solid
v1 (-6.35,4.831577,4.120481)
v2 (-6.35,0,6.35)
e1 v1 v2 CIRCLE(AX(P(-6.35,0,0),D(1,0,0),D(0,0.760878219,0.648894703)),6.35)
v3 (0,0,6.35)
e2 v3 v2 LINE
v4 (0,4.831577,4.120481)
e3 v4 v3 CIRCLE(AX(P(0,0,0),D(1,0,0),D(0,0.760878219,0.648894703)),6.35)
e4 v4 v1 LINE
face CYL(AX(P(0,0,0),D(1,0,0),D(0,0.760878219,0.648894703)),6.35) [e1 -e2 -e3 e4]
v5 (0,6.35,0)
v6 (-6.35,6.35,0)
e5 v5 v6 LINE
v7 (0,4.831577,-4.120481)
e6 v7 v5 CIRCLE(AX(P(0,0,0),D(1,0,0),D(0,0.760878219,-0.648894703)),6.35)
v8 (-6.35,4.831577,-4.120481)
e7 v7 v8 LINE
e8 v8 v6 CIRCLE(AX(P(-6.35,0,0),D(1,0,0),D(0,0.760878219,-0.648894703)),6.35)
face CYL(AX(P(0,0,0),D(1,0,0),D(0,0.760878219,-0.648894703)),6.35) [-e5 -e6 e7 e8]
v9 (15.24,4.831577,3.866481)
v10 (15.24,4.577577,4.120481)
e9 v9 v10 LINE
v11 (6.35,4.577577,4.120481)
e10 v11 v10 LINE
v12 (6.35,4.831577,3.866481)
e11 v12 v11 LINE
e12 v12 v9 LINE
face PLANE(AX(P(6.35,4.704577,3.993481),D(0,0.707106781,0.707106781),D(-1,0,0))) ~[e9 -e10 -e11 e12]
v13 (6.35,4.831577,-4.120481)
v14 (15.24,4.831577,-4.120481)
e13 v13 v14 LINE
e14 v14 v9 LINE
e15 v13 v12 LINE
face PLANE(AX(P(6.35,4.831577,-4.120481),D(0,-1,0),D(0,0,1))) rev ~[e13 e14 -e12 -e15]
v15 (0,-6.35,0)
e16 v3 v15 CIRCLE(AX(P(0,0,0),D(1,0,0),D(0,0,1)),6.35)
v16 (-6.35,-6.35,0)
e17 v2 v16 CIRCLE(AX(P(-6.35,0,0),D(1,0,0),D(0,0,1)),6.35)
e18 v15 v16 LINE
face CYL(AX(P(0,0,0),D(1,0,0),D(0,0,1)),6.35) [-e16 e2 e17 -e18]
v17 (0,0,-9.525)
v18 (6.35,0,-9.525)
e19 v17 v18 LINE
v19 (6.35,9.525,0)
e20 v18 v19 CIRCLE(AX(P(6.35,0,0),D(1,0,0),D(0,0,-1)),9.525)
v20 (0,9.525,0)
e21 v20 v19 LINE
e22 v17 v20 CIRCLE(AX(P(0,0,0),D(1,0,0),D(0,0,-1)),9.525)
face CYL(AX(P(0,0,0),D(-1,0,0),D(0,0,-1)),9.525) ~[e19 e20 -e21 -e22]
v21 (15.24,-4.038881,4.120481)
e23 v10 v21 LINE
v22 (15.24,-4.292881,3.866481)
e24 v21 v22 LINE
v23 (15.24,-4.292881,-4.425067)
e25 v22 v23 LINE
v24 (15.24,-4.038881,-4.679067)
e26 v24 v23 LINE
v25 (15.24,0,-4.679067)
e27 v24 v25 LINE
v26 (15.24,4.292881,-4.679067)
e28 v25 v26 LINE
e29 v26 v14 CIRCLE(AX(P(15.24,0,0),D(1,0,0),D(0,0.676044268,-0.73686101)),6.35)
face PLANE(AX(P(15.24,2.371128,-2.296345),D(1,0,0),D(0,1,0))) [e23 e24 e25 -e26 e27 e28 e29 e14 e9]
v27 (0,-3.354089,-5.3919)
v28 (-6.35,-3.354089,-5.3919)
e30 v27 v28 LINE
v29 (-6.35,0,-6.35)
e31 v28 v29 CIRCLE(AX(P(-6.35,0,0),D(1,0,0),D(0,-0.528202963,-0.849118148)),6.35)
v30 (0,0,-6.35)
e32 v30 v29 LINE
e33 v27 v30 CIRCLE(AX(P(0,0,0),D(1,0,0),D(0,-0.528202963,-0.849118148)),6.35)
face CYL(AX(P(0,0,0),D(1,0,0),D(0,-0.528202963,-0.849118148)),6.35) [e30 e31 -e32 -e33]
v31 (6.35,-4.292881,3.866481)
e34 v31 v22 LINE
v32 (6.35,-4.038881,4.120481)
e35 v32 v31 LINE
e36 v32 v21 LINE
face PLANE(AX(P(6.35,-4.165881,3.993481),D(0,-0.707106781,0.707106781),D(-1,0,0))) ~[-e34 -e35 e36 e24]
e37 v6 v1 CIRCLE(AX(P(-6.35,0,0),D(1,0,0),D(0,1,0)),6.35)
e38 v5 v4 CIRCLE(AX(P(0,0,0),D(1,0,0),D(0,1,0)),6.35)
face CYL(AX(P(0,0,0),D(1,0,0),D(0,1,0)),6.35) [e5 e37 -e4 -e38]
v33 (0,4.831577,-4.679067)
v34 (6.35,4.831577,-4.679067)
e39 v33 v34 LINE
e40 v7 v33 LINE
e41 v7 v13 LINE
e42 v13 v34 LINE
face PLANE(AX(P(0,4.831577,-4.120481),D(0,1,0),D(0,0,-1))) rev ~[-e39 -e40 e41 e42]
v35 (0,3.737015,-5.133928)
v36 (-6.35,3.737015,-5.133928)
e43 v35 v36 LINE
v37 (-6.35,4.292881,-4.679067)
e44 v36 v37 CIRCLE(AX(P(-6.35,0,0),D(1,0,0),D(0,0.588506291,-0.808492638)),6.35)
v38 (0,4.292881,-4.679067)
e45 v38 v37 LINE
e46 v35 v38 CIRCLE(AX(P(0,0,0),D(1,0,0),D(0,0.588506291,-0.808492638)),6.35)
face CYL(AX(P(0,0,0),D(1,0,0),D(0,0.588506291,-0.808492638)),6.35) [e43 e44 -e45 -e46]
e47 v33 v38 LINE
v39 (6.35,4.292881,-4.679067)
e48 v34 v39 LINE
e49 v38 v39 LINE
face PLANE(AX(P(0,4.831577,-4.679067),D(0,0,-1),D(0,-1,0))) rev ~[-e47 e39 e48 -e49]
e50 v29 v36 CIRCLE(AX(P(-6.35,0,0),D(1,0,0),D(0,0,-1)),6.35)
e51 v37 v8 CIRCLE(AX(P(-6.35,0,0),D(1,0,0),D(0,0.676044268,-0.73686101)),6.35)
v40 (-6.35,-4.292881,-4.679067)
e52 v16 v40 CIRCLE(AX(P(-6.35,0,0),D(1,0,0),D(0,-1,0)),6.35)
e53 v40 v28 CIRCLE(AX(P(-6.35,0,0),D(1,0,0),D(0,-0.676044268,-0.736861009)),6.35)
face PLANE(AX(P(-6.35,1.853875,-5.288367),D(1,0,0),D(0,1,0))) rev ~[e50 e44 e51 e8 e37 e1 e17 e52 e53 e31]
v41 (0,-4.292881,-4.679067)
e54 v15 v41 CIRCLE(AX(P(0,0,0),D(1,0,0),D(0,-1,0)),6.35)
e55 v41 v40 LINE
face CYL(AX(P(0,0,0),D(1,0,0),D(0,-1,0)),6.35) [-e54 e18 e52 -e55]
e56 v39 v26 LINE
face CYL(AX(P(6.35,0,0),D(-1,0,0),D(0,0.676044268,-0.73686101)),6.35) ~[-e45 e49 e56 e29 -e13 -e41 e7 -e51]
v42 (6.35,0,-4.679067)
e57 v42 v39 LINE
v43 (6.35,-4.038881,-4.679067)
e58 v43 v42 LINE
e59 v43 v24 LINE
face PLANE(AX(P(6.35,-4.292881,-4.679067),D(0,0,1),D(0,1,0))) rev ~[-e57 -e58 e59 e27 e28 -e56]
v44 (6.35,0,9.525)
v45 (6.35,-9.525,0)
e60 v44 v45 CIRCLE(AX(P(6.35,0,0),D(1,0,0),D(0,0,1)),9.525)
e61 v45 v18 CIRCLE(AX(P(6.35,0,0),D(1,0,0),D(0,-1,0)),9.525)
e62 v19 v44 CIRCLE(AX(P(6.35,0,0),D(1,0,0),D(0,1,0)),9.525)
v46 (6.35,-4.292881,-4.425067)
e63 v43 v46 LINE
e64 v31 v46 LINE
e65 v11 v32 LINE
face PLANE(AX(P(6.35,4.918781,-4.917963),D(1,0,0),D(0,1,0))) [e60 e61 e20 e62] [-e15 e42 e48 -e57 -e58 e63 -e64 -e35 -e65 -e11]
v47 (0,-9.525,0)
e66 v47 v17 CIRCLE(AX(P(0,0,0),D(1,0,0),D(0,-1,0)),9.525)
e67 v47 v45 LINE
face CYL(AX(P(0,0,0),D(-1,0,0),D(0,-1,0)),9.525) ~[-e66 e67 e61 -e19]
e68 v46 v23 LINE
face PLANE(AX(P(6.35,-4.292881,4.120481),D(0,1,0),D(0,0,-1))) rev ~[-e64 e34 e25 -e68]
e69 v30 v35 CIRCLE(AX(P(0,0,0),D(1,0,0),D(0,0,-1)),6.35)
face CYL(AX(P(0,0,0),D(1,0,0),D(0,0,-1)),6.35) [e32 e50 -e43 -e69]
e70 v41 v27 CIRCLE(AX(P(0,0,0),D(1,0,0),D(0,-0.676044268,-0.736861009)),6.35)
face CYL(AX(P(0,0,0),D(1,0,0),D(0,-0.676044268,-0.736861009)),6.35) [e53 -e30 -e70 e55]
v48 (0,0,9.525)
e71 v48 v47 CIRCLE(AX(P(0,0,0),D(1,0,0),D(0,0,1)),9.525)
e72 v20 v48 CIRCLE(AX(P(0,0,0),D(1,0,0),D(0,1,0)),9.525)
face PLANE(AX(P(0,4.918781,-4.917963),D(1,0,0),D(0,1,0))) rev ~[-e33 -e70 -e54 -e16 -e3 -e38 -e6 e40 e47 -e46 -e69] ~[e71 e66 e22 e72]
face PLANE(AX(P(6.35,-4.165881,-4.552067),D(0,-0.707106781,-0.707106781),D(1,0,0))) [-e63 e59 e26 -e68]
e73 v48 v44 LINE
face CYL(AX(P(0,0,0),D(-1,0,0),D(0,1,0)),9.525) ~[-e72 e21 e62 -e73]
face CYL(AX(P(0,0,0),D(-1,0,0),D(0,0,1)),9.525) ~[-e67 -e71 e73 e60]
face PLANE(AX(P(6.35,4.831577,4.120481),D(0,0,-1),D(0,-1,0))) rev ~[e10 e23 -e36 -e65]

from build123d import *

# Parameters (mm, degrees)
F0_W          = 4.8315766917
F0_H          = 4.1204813641
F0_W_2        = 4.2928811043
F0_H_2        = 4.6790674097
F1_DEPTH      = 6.35
F1_DEPTH_BACK = 6.35
F2_DEPTH      = 6.35
F3_START      = 6.35
F3_DEPTH      = 8.89
F4_SIZE       = 0.254


# Not quite as in the source:
# - a feature names something its author has since deleted; it is built from what else it names


with BuildPart() as f1:
    # F0 (on Right) → F1 (new body, two sides)
    with BuildSketch(Plane.YZ) as f1_sk:
        with BuildLine():
            Line((0, -4.6790674097), (0, -6.35))
            ThreePointArc((0, -6.35), (1.9649498234, -6.0383335608), (3.7370149493, -5.1339282493))
            ThreePointArc((3.7370149493, -5.1339282493), (4.0213843703, -4.9143634121), (4.2928811043, -4.6790674097))
            Line((4.2928811043, -4.6790674097), (0, -4.6790674097))
        make_face()
        with BuildLine():
            Line((4.8315766917, -4.1204813641), (4.8315766917, 0))
            Line((4.8315766917, 0), (0, 0))
            Line((0, 0), (0, -4.6790674097))
            Line((0, -4.6790674097), (4.2928811043, -4.6790674097))
            ThreePointArc((4.2928811043, -4.6790674097), (4.5707698597, -4.4080112171), (4.8315766917, -4.1204813641))
        make_face()
        with Locations((2.4157883458, 2.0602406821)):
            Rectangle(F0_W, F0_H)
        with Locations((-2.1464405521, 2.0602406821)):
            Rectangle(F0_W_2, F0_H)
        with Locations((-2.1464405521, -2.3395337049)):
            Rectangle(F0_W_2, F0_H_2)
        with BuildLine():
            Line((-4.2928811043, 0), (-6.35, 0))
            ThreePointArc((-6.35, 0), (-5.813015354, -2.55565109), (-4.2928811043, -4.6790674097))
            Line((-4.2928811043, -4.6790674097), (-4.2928811043, 0))
        make_face()
        with BuildLine():
            ThreePointArc((-3.3540888173, -5.3919002407), (-1.7441234864, -6.105778678), (0, -6.35))
            Line((0, -6.35), (0, -4.6790674097))
            Line((0, -4.6790674097), (-4.2928811043, -4.6790674097))
            ThreePointArc((-4.2928811043, -4.6790674097), (-3.8400611852, -5.057314514), (-3.3540888173, -5.3919002407))
        make_face()
        with BuildLine():
            Line((4.8315766917, 0), (6.35, 0))
            ThreePointArc((6.35, 0), (5.958314023, 2.1956762065), (4.8315766917, 4.1204813641))
            Line((4.8315766917, 4.1204813641), (4.8315766917, 0))
        make_face()
        with BuildLine():
            ThreePointArc((4.8315766917, -4.1204813641), (5.958314023, -2.1956762065), (6.35, 0))
            Line((6.35, 0), (4.8315766917, 0))
            Line((4.8315766917, 0), (4.8315766917, -4.1204813641))
        make_face()
        with BuildLine():
            ThreePointArc((4.8315766917, 4.1204813641), (2.6605867151, 5.765741785), (0, 6.35))
            Line((0, 6.35), (0, 4.1204813641))
            Line((0, 4.1204813641), (4.8315766917, 4.1204813641))
        make_face()
        with BuildLine():
            Line((0, 4.1204813641), (0, 6.35))
            ThreePointArc((0, 6.35), (-4.4901280605, 4.4901280605), (-6.35, 0))
            Line((-6.35, 0), (-4.2928811043, 0))
            Line((-4.2928811043, 0), (-4.2928811043, 4.1204813641))
            Line((-4.2928811043, 4.1204813641), (0, 4.1204813641))
        make_face()
    extrude(amount=F1_DEPTH)
    extrude(f1_sk.sketch, amount=-F1_DEPTH_BACK)

    # F0 (on Right) → F2 (join)
    with BuildSketch(Plane.YZ):
        with BuildLine():
            ThreePointArc((0, -9.525), (6.7351920908, -6.7351920908), (9.525, 0))
            Line((9.525, 0), (6.35, 0))
            ThreePointArc((6.35, 0), (5.958314023, -2.1956762065), (4.8315766917, -4.1204813641))
            Line((4.8315766917, -4.1204813641), (4.8315766917, -4.6790674097))
            Line((4.8315766917, -4.6790674097), (4.2928811043, -4.6790674097))
            ThreePointArc((4.2928811043, -4.6790674097), (4.0213843703, -4.9143634121), (3.7370149493, -5.1339282493))
            ThreePointArc((3.7370149493, -5.1339282493), (1.9649498234, -6.0383335608), (0, -6.35))
            Line((0, -6.35), (0, -9.525))
        make_face()
        with BuildLine():
            Line((6.35, 0), (9.525, 0))
            ThreePointArc((9.525, 0), (6.7351920908, 6.7351920908), (0, 9.525))
            Line((0, 9.525), (0, 6.35))
            ThreePointArc((0, 6.35), (2.6605867151, 5.765741785), (4.8315766917, 4.1204813641))
            ThreePointArc((4.8315766917, 4.1204813641), (5.958314023, 2.1956762065), (6.35, 0))
        make_face()
        with BuildLine():
            Line((0, 6.35), (0, 9.525))
            ThreePointArc((0, 9.525), (-6.7351920908, 6.7351920908), (-9.525, 0))
            Line((-9.525, 0), (-6.35, 0))
            ThreePointArc((-6.35, 0), (-4.4901280605, 4.4901280605), (0, 6.35))
        make_face()
        with BuildLine():
            ThreePointArc((-9.525, 0), (-6.7351920908, -6.7351920908), (0, -9.525))
            Line((0, -9.525), (0, -6.35))
            ThreePointArc((0, -6.35), (-1.7441234864, -6.105778678), (-3.3540888173, -5.3919002407))
            ThreePointArc((-3.3540888173, -5.3919002407), (-3.8400611852, -5.057314514), (-4.2928811043, -4.6790674097))
            ThreePointArc((-4.2928811043, -4.6790674097), (-5.813015354, -2.55565109), (-6.35, 0))
            Line((-6.35, 0), (-9.525, 0))
        make_face()
    extrude(amount=F2_DEPTH)

    # F0 (on Right) → F3 (join)
    with BuildSketch(Plane.YZ.offset(F3_START)):
        with BuildLine():
            Line((4.8315766917, -4.1204813641), (4.8315766917, 0))
            Line((4.8315766917, 0), (0, 0))
            Line((0, 0), (0, -4.6790674097))
            Line((0, -4.6790674097), (4.2928811043, -4.6790674097))
            ThreePointArc((4.2928811043, -4.6790674097), (4.5707698597, -4.4080112171), (4.8315766917, -4.1204813641))
        make_face()
        with Locations((2.4157883458, 2.0602406821)):
            Rectangle(F0_W, F0_H)
        with Locations((-2.1464405521, 2.0602406821)):
            Rectangle(F0_W_2, F0_H)
        with Locations((-2.1464405521, -2.3395337049)):
            Rectangle(F0_W_2, F0_H_2)
    extrude(amount=F3_DEPTH)

    # F4
    f4_edges = [f1.edges().sort_by_distance(p)[0] for p in [
        (10.795, -4.292881, 4.120481),
        (10.795, -4.292881, -4.679067),
        (10.795, 4.831577, 4.120481),
    ]]
    chamfer(f4_edges, length=F4_SIZE)


solid = f1.part
